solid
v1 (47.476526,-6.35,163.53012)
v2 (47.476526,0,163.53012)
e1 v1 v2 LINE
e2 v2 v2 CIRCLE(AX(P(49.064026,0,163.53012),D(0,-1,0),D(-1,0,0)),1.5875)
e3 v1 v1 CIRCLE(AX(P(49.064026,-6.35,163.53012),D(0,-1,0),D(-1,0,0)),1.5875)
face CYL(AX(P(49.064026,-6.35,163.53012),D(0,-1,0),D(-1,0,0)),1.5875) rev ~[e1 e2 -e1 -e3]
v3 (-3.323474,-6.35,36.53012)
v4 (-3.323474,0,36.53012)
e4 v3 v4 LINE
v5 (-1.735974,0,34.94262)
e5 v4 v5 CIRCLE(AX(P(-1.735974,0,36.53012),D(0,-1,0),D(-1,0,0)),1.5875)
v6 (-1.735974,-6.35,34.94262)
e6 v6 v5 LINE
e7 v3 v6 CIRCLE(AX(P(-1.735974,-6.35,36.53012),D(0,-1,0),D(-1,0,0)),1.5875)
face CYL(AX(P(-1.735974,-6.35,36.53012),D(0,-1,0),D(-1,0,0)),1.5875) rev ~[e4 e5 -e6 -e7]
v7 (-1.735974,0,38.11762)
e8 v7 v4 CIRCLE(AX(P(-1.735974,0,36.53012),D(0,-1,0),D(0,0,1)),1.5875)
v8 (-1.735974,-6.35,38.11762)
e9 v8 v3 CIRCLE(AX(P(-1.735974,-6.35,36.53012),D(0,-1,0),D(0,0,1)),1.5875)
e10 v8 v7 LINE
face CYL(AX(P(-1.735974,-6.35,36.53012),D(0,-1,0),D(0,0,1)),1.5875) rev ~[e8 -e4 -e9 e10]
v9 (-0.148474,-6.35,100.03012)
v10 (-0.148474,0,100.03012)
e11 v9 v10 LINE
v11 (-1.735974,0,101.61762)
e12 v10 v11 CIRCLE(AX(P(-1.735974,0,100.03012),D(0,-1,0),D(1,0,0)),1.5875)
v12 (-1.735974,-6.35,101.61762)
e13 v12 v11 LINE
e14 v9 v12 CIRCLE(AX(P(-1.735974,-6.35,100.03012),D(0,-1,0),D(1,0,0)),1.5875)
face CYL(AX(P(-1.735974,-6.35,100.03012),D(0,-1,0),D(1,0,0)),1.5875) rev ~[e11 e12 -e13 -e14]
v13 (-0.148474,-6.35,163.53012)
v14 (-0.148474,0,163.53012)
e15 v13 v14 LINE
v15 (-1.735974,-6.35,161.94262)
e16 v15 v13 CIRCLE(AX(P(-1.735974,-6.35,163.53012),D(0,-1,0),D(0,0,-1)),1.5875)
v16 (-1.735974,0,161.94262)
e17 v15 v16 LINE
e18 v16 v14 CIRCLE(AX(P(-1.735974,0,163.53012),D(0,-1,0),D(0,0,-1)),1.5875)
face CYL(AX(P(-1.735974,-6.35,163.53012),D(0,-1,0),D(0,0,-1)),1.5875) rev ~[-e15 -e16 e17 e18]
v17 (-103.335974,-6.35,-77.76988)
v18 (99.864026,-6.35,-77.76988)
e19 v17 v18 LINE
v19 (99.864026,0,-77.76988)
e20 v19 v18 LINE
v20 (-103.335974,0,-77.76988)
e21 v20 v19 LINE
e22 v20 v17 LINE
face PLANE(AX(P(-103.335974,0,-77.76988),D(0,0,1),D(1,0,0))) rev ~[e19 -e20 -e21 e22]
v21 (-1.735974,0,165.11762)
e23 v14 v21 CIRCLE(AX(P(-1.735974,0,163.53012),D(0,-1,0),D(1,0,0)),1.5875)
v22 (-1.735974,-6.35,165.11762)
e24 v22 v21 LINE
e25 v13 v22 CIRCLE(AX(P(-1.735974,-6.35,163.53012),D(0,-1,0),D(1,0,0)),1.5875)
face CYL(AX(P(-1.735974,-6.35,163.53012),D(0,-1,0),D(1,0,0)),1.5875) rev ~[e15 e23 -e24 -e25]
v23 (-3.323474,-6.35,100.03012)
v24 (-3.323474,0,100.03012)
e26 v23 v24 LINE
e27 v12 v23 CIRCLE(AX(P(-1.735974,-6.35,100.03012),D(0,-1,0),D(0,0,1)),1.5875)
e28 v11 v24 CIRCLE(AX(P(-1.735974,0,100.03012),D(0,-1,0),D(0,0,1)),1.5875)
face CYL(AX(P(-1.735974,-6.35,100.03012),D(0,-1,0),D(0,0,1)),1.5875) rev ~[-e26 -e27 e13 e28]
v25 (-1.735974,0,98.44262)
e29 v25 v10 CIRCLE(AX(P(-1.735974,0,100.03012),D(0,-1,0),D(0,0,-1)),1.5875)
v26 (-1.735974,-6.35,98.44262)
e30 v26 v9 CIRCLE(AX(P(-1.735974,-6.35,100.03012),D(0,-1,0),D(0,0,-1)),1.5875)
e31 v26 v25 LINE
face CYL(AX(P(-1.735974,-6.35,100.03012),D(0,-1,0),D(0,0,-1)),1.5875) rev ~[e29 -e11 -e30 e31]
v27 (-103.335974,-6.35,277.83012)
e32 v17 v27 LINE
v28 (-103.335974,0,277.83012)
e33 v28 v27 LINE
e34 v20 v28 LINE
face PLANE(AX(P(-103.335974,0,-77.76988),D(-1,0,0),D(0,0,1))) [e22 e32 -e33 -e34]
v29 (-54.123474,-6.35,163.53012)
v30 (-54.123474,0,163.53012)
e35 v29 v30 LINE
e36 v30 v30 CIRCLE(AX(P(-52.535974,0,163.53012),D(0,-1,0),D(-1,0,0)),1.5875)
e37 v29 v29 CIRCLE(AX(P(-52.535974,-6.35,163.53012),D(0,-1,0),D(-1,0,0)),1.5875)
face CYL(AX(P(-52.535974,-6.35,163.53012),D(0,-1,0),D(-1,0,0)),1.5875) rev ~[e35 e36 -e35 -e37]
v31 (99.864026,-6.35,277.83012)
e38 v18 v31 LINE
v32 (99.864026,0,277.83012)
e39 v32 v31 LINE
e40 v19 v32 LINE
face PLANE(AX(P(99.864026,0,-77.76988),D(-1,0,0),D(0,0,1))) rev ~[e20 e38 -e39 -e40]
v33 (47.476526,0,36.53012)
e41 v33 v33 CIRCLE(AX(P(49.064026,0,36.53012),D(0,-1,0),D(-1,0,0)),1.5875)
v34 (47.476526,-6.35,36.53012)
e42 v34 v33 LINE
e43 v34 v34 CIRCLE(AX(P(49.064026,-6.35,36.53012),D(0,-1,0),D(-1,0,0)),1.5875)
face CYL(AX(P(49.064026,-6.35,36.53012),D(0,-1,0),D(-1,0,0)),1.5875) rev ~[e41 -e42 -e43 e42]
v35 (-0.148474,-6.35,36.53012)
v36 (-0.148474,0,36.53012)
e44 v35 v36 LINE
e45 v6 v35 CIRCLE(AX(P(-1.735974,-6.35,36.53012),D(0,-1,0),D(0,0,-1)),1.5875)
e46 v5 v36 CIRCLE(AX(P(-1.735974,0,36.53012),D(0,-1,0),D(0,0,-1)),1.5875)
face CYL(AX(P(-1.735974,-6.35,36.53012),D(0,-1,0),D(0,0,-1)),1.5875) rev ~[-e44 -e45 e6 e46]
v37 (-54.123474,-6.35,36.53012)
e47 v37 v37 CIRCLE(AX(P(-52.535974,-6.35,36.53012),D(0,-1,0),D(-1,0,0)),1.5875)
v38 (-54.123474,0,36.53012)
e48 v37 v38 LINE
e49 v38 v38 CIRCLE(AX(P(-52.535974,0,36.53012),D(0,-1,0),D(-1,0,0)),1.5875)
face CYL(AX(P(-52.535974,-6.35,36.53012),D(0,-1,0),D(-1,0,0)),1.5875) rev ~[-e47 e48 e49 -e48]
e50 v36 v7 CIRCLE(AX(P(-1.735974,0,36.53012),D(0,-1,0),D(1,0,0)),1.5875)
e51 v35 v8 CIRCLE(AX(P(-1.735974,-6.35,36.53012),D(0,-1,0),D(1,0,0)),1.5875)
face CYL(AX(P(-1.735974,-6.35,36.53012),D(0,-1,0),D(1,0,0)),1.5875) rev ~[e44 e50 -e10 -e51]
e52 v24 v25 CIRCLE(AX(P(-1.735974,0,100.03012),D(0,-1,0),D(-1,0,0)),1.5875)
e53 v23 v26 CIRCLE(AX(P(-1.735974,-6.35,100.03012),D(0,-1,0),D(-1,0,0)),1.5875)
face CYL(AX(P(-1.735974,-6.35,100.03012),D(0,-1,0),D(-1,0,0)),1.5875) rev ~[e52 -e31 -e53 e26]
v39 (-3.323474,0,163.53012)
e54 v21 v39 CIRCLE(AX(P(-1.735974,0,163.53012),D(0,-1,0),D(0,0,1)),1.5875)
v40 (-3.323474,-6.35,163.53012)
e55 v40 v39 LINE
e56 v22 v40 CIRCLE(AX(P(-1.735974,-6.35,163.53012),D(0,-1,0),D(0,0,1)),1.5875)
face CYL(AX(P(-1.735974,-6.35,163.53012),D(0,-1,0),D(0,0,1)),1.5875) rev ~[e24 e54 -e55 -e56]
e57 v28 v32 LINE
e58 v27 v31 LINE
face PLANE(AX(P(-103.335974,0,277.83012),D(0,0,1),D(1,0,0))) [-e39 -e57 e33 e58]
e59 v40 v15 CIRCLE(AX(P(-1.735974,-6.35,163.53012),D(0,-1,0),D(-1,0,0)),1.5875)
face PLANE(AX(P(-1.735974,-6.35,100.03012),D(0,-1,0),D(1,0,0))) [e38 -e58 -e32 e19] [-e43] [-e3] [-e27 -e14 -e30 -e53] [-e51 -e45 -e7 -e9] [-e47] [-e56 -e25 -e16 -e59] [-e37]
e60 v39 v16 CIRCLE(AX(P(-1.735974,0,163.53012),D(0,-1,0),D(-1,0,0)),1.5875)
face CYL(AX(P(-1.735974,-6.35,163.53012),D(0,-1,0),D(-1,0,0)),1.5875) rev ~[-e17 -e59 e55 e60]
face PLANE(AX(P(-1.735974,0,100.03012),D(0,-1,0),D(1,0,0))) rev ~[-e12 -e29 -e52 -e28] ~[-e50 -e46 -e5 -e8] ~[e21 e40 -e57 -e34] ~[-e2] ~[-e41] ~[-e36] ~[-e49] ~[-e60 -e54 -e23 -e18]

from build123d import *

# Parameters (mm, degrees)
F0_W     = 203.2
F0_H     = 355.6
F1_DEPTH = 6.35
F3_DEPTH = 25.4


# Not quite as in the source:
# - a feature names something its author has since deleted; it is built from what else it names


with BuildPart() as f1:
    # F0 (on Front) → F1 (new body)
    with BuildSketch(Plane.XZ):
        with Locations((-1.7359743744, 100.030120313)):
            Rectangle(F0_W, F0_H)
    extrude(amount=F1_DEPTH)

    # F2 (on face) → F3 (cut)
    with BuildSketch(Plane.XZ.offset(6.35)):
        with BuildLine():
            Line((-1.7359743744, 100.030120313), (-0.1484743744, 100.030120313))
            ThreePointArc((-0.1484743744, 100.030120313), (-0.6134423593, 101.1526523282), (-1.7359743744, 101.617620313))
            Line((-1.7359743744, 101.617620313), (-1.7359743744, 100.030120313))
        make_face()
        with BuildLine():
            ThreePointArc((-1.7359743744, 98.442620313), (-0.6134423593, 98.9075882979), (-0.1484743744, 100.030120313))
            Line((-0.1484743744, 100.030120313), (-1.7359743744, 100.030120313))
            Line((-1.7359743744, 100.030120313), (-1.7359743744, 98.442620313))
        make_face()
        with BuildLine():
            Line((-1.7359743744, 100.030120313), (-1.7359743744, 101.617620313))
            ThreePointArc((-1.7359743744, 101.617620313), (-2.8585063895, 101.1526523282), (-3.3234743744, 100.030120313))
            Line((-3.3234743744, 100.030120313), (-1.7359743744, 100.030120313))
        make_face()
        with BuildLine():
            ThreePointArc((-3.3234743744, 100.030120313), (-2.8585063895, 98.9075882979), (-1.7359743744, 98.442620313))
            Line((-1.7359743744, 98.442620313), (-1.7359743744, 100.030120313))
            Line((-1.7359743744, 100.030120313), (-3.3234743744, 100.030120313))
        make_face()
        with BuildLine():
            Line((-1.7359743744, 163.530120313), (-1.7359743744, 161.942620313))
            ThreePointArc((-1.7359743744, 161.942620313), (-0.6134423593, 162.4075882979), (-0.1484743744, 163.530120313))
            Line((-0.1484743744, 163.530120313), (-1.7359743744, 163.530120313))
        make_face()
        with BuildLine():
            ThreePointArc((-3.3234743744, 163.530120313), (-2.8585063895, 162.4075882979), (-1.7359743744, 161.942620313))
            Line((-1.7359743744, 161.942620313), (-1.7359743744, 163.530120313))
            Line((-1.7359743744, 163.530120313), (-3.3234743744, 163.530120313))
        make_face()
        with BuildLine():
            Line((-1.7359743744, 36.530120313), (-1.7359743744, 38.117620313))
            ThreePointArc((-1.7359743744, 38.117620313), (-2.8585063895, 37.6526523282), (-3.3234743744, 36.530120313))
            Line((-3.3234743744, 36.530120313), (-1.7359743744, 36.530120313))
        make_face()
        with BuildLine():
            ThreePointArc((-0.1484743744, 36.530120313), (-0.6134423593, 37.6526523282), (-1.7359743744, 38.117620313))
            Line((-1.7359743744, 38.117620313), (-1.7359743744, 36.530120313))
            Line((-1.7359743744, 36.530120313), (-0.1484743744, 36.530120313))
        make_face()
        with BuildLine():
            ThreePointArc((-1.7359743744, 165.117620313), (-2.8585063895, 164.6526523282), (-3.3234743744, 163.530120313))
            Line((-3.3234743744, 163.530120313), (-1.7359743744, 163.530120313))
            Line((-1.7359743744, 163.530120313), (-1.7359743744, 165.117620313))
        make_face()
        with BuildLine():
            Line((-1.7359743744, 163.530120313), (-0.1484743744, 163.530120313))
            ThreePointArc((-0.1484743744, 163.530120313), (-0.6134423593, 164.6526523282), (-1.7359743744, 165.117620313))
            Line((-1.7359743744, 165.117620313), (-1.7359743744, 163.530120313))
        make_face()
        with BuildLine():
            ThreePointArc((-1.7359743744, 34.942620313), (-0.6134423593, 35.4075882979), (-0.1484743744, 36.530120313))
            Line((-0.1484743744, 36.530120313), (-1.7359743744, 36.530120313))
            Line((-1.7359743744, 36.530120313), (-1.7359743744, 34.942620313))
        make_face()
        with BuildLine():
            Line((-1.7359743744, 36.530120313), (-3.3234743744, 36.530120313))
            ThreePointArc((-3.3234743744, 36.530120313), (-2.8585063895, 35.4075882979), (-1.7359743744, 34.942620313))
            Line((-1.7359743744, 34.942620313), (-1.7359743744, 36.530120313))
        make_face()
        with BuildLine():
            Line((49.0640256256, 36.530120313), (50.6515256256, 36.530120313))
            ThreePointArc((50.6515256256, 36.530120313), (49.0640256256, 38.117620313), (47.4765256256, 36.530120313))
            Line((47.4765256256, 36.530120313), (49.0640256256, 36.530120313))
        make_face()
        with BuildLine():
            ThreePointArc((47.4765256256, 36.530120313), (49.0640256256, 34.942620313), (50.6515256256, 36.530120313))
            Line((50.6515256256, 36.530120313), (49.0640256256, 36.530120313))
            Line((49.0640256256, 36.530120313), (47.4765256256, 36.530120313))
        make_face()
        with BuildLine():
            Line((49.0640256256, 163.530120313), (50.6515256256, 163.530120313))
            ThreePointArc((50.6515256256, 163.530120313), (49.0640256256, 165.117620313), (47.4765256256, 163.530120313))
            Line((47.4765256256, 163.530120313), (49.0640256256, 163.530120313))
        make_face()
        with BuildLine():
            ThreePointArc((47.4765256256, 163.530120313), (49.0640256256, 161.942620313), (50.6515256256, 163.530120313))
            Line((50.6515256256, 163.530120313), (49.0640256256, 163.530120313))
            Line((49.0640256256, 163.530120313), (47.4765256256, 163.530120313))
        make_face()
        with BuildLine():
            Line((-52.5359743744, 163.530120313), (-50.9484743744, 163.530120313))
            ThreePointArc((-50.9484743744, 163.530120313), (-52.5359743744, 165.117620313), (-54.1234743744, 163.530120313))
            Line((-54.1234743744, 163.530120313), (-52.5359743744, 163.530120313))
        make_face()
        with BuildLine():
            ThreePointArc((-54.1234743744, 163.530120313), (-52.5359743744, 161.942620313), (-50.9484743744, 163.530120313))
            Line((-50.9484743744, 163.530120313), (-52.5359743744, 163.530120313))
            Line((-52.5359743744, 163.530120313), (-54.1234743744, 163.530120313))
        make_face()
        with BuildLine():
            Line((-52.5359743744, 36.530120313), (-50.9484743744, 36.530120313))
            ThreePointArc((-50.9484743744, 36.530120313), (-52.5359743744, 38.117620313), (-54.1234743744, 36.530120313))
            Line((-54.1234743744, 36.530120313), (-52.5359743744, 36.530120313))
        make_face()
        with BuildLine():
            ThreePointArc((-54.1234743744, 36.530120313), (-52.5359743744, 34.942620313), (-50.9484743744, 36.530120313))
            Line((-50.9484743744, 36.530120313), (-52.5359743744, 36.530120313))
            Line((-52.5359743744, 36.530120313), (-54.1234743744, 36.530120313))
        make_face()
    extrude(amount=-F3_DEPTH, mode=Mode.SUBTRACT)


solid = f1.part
